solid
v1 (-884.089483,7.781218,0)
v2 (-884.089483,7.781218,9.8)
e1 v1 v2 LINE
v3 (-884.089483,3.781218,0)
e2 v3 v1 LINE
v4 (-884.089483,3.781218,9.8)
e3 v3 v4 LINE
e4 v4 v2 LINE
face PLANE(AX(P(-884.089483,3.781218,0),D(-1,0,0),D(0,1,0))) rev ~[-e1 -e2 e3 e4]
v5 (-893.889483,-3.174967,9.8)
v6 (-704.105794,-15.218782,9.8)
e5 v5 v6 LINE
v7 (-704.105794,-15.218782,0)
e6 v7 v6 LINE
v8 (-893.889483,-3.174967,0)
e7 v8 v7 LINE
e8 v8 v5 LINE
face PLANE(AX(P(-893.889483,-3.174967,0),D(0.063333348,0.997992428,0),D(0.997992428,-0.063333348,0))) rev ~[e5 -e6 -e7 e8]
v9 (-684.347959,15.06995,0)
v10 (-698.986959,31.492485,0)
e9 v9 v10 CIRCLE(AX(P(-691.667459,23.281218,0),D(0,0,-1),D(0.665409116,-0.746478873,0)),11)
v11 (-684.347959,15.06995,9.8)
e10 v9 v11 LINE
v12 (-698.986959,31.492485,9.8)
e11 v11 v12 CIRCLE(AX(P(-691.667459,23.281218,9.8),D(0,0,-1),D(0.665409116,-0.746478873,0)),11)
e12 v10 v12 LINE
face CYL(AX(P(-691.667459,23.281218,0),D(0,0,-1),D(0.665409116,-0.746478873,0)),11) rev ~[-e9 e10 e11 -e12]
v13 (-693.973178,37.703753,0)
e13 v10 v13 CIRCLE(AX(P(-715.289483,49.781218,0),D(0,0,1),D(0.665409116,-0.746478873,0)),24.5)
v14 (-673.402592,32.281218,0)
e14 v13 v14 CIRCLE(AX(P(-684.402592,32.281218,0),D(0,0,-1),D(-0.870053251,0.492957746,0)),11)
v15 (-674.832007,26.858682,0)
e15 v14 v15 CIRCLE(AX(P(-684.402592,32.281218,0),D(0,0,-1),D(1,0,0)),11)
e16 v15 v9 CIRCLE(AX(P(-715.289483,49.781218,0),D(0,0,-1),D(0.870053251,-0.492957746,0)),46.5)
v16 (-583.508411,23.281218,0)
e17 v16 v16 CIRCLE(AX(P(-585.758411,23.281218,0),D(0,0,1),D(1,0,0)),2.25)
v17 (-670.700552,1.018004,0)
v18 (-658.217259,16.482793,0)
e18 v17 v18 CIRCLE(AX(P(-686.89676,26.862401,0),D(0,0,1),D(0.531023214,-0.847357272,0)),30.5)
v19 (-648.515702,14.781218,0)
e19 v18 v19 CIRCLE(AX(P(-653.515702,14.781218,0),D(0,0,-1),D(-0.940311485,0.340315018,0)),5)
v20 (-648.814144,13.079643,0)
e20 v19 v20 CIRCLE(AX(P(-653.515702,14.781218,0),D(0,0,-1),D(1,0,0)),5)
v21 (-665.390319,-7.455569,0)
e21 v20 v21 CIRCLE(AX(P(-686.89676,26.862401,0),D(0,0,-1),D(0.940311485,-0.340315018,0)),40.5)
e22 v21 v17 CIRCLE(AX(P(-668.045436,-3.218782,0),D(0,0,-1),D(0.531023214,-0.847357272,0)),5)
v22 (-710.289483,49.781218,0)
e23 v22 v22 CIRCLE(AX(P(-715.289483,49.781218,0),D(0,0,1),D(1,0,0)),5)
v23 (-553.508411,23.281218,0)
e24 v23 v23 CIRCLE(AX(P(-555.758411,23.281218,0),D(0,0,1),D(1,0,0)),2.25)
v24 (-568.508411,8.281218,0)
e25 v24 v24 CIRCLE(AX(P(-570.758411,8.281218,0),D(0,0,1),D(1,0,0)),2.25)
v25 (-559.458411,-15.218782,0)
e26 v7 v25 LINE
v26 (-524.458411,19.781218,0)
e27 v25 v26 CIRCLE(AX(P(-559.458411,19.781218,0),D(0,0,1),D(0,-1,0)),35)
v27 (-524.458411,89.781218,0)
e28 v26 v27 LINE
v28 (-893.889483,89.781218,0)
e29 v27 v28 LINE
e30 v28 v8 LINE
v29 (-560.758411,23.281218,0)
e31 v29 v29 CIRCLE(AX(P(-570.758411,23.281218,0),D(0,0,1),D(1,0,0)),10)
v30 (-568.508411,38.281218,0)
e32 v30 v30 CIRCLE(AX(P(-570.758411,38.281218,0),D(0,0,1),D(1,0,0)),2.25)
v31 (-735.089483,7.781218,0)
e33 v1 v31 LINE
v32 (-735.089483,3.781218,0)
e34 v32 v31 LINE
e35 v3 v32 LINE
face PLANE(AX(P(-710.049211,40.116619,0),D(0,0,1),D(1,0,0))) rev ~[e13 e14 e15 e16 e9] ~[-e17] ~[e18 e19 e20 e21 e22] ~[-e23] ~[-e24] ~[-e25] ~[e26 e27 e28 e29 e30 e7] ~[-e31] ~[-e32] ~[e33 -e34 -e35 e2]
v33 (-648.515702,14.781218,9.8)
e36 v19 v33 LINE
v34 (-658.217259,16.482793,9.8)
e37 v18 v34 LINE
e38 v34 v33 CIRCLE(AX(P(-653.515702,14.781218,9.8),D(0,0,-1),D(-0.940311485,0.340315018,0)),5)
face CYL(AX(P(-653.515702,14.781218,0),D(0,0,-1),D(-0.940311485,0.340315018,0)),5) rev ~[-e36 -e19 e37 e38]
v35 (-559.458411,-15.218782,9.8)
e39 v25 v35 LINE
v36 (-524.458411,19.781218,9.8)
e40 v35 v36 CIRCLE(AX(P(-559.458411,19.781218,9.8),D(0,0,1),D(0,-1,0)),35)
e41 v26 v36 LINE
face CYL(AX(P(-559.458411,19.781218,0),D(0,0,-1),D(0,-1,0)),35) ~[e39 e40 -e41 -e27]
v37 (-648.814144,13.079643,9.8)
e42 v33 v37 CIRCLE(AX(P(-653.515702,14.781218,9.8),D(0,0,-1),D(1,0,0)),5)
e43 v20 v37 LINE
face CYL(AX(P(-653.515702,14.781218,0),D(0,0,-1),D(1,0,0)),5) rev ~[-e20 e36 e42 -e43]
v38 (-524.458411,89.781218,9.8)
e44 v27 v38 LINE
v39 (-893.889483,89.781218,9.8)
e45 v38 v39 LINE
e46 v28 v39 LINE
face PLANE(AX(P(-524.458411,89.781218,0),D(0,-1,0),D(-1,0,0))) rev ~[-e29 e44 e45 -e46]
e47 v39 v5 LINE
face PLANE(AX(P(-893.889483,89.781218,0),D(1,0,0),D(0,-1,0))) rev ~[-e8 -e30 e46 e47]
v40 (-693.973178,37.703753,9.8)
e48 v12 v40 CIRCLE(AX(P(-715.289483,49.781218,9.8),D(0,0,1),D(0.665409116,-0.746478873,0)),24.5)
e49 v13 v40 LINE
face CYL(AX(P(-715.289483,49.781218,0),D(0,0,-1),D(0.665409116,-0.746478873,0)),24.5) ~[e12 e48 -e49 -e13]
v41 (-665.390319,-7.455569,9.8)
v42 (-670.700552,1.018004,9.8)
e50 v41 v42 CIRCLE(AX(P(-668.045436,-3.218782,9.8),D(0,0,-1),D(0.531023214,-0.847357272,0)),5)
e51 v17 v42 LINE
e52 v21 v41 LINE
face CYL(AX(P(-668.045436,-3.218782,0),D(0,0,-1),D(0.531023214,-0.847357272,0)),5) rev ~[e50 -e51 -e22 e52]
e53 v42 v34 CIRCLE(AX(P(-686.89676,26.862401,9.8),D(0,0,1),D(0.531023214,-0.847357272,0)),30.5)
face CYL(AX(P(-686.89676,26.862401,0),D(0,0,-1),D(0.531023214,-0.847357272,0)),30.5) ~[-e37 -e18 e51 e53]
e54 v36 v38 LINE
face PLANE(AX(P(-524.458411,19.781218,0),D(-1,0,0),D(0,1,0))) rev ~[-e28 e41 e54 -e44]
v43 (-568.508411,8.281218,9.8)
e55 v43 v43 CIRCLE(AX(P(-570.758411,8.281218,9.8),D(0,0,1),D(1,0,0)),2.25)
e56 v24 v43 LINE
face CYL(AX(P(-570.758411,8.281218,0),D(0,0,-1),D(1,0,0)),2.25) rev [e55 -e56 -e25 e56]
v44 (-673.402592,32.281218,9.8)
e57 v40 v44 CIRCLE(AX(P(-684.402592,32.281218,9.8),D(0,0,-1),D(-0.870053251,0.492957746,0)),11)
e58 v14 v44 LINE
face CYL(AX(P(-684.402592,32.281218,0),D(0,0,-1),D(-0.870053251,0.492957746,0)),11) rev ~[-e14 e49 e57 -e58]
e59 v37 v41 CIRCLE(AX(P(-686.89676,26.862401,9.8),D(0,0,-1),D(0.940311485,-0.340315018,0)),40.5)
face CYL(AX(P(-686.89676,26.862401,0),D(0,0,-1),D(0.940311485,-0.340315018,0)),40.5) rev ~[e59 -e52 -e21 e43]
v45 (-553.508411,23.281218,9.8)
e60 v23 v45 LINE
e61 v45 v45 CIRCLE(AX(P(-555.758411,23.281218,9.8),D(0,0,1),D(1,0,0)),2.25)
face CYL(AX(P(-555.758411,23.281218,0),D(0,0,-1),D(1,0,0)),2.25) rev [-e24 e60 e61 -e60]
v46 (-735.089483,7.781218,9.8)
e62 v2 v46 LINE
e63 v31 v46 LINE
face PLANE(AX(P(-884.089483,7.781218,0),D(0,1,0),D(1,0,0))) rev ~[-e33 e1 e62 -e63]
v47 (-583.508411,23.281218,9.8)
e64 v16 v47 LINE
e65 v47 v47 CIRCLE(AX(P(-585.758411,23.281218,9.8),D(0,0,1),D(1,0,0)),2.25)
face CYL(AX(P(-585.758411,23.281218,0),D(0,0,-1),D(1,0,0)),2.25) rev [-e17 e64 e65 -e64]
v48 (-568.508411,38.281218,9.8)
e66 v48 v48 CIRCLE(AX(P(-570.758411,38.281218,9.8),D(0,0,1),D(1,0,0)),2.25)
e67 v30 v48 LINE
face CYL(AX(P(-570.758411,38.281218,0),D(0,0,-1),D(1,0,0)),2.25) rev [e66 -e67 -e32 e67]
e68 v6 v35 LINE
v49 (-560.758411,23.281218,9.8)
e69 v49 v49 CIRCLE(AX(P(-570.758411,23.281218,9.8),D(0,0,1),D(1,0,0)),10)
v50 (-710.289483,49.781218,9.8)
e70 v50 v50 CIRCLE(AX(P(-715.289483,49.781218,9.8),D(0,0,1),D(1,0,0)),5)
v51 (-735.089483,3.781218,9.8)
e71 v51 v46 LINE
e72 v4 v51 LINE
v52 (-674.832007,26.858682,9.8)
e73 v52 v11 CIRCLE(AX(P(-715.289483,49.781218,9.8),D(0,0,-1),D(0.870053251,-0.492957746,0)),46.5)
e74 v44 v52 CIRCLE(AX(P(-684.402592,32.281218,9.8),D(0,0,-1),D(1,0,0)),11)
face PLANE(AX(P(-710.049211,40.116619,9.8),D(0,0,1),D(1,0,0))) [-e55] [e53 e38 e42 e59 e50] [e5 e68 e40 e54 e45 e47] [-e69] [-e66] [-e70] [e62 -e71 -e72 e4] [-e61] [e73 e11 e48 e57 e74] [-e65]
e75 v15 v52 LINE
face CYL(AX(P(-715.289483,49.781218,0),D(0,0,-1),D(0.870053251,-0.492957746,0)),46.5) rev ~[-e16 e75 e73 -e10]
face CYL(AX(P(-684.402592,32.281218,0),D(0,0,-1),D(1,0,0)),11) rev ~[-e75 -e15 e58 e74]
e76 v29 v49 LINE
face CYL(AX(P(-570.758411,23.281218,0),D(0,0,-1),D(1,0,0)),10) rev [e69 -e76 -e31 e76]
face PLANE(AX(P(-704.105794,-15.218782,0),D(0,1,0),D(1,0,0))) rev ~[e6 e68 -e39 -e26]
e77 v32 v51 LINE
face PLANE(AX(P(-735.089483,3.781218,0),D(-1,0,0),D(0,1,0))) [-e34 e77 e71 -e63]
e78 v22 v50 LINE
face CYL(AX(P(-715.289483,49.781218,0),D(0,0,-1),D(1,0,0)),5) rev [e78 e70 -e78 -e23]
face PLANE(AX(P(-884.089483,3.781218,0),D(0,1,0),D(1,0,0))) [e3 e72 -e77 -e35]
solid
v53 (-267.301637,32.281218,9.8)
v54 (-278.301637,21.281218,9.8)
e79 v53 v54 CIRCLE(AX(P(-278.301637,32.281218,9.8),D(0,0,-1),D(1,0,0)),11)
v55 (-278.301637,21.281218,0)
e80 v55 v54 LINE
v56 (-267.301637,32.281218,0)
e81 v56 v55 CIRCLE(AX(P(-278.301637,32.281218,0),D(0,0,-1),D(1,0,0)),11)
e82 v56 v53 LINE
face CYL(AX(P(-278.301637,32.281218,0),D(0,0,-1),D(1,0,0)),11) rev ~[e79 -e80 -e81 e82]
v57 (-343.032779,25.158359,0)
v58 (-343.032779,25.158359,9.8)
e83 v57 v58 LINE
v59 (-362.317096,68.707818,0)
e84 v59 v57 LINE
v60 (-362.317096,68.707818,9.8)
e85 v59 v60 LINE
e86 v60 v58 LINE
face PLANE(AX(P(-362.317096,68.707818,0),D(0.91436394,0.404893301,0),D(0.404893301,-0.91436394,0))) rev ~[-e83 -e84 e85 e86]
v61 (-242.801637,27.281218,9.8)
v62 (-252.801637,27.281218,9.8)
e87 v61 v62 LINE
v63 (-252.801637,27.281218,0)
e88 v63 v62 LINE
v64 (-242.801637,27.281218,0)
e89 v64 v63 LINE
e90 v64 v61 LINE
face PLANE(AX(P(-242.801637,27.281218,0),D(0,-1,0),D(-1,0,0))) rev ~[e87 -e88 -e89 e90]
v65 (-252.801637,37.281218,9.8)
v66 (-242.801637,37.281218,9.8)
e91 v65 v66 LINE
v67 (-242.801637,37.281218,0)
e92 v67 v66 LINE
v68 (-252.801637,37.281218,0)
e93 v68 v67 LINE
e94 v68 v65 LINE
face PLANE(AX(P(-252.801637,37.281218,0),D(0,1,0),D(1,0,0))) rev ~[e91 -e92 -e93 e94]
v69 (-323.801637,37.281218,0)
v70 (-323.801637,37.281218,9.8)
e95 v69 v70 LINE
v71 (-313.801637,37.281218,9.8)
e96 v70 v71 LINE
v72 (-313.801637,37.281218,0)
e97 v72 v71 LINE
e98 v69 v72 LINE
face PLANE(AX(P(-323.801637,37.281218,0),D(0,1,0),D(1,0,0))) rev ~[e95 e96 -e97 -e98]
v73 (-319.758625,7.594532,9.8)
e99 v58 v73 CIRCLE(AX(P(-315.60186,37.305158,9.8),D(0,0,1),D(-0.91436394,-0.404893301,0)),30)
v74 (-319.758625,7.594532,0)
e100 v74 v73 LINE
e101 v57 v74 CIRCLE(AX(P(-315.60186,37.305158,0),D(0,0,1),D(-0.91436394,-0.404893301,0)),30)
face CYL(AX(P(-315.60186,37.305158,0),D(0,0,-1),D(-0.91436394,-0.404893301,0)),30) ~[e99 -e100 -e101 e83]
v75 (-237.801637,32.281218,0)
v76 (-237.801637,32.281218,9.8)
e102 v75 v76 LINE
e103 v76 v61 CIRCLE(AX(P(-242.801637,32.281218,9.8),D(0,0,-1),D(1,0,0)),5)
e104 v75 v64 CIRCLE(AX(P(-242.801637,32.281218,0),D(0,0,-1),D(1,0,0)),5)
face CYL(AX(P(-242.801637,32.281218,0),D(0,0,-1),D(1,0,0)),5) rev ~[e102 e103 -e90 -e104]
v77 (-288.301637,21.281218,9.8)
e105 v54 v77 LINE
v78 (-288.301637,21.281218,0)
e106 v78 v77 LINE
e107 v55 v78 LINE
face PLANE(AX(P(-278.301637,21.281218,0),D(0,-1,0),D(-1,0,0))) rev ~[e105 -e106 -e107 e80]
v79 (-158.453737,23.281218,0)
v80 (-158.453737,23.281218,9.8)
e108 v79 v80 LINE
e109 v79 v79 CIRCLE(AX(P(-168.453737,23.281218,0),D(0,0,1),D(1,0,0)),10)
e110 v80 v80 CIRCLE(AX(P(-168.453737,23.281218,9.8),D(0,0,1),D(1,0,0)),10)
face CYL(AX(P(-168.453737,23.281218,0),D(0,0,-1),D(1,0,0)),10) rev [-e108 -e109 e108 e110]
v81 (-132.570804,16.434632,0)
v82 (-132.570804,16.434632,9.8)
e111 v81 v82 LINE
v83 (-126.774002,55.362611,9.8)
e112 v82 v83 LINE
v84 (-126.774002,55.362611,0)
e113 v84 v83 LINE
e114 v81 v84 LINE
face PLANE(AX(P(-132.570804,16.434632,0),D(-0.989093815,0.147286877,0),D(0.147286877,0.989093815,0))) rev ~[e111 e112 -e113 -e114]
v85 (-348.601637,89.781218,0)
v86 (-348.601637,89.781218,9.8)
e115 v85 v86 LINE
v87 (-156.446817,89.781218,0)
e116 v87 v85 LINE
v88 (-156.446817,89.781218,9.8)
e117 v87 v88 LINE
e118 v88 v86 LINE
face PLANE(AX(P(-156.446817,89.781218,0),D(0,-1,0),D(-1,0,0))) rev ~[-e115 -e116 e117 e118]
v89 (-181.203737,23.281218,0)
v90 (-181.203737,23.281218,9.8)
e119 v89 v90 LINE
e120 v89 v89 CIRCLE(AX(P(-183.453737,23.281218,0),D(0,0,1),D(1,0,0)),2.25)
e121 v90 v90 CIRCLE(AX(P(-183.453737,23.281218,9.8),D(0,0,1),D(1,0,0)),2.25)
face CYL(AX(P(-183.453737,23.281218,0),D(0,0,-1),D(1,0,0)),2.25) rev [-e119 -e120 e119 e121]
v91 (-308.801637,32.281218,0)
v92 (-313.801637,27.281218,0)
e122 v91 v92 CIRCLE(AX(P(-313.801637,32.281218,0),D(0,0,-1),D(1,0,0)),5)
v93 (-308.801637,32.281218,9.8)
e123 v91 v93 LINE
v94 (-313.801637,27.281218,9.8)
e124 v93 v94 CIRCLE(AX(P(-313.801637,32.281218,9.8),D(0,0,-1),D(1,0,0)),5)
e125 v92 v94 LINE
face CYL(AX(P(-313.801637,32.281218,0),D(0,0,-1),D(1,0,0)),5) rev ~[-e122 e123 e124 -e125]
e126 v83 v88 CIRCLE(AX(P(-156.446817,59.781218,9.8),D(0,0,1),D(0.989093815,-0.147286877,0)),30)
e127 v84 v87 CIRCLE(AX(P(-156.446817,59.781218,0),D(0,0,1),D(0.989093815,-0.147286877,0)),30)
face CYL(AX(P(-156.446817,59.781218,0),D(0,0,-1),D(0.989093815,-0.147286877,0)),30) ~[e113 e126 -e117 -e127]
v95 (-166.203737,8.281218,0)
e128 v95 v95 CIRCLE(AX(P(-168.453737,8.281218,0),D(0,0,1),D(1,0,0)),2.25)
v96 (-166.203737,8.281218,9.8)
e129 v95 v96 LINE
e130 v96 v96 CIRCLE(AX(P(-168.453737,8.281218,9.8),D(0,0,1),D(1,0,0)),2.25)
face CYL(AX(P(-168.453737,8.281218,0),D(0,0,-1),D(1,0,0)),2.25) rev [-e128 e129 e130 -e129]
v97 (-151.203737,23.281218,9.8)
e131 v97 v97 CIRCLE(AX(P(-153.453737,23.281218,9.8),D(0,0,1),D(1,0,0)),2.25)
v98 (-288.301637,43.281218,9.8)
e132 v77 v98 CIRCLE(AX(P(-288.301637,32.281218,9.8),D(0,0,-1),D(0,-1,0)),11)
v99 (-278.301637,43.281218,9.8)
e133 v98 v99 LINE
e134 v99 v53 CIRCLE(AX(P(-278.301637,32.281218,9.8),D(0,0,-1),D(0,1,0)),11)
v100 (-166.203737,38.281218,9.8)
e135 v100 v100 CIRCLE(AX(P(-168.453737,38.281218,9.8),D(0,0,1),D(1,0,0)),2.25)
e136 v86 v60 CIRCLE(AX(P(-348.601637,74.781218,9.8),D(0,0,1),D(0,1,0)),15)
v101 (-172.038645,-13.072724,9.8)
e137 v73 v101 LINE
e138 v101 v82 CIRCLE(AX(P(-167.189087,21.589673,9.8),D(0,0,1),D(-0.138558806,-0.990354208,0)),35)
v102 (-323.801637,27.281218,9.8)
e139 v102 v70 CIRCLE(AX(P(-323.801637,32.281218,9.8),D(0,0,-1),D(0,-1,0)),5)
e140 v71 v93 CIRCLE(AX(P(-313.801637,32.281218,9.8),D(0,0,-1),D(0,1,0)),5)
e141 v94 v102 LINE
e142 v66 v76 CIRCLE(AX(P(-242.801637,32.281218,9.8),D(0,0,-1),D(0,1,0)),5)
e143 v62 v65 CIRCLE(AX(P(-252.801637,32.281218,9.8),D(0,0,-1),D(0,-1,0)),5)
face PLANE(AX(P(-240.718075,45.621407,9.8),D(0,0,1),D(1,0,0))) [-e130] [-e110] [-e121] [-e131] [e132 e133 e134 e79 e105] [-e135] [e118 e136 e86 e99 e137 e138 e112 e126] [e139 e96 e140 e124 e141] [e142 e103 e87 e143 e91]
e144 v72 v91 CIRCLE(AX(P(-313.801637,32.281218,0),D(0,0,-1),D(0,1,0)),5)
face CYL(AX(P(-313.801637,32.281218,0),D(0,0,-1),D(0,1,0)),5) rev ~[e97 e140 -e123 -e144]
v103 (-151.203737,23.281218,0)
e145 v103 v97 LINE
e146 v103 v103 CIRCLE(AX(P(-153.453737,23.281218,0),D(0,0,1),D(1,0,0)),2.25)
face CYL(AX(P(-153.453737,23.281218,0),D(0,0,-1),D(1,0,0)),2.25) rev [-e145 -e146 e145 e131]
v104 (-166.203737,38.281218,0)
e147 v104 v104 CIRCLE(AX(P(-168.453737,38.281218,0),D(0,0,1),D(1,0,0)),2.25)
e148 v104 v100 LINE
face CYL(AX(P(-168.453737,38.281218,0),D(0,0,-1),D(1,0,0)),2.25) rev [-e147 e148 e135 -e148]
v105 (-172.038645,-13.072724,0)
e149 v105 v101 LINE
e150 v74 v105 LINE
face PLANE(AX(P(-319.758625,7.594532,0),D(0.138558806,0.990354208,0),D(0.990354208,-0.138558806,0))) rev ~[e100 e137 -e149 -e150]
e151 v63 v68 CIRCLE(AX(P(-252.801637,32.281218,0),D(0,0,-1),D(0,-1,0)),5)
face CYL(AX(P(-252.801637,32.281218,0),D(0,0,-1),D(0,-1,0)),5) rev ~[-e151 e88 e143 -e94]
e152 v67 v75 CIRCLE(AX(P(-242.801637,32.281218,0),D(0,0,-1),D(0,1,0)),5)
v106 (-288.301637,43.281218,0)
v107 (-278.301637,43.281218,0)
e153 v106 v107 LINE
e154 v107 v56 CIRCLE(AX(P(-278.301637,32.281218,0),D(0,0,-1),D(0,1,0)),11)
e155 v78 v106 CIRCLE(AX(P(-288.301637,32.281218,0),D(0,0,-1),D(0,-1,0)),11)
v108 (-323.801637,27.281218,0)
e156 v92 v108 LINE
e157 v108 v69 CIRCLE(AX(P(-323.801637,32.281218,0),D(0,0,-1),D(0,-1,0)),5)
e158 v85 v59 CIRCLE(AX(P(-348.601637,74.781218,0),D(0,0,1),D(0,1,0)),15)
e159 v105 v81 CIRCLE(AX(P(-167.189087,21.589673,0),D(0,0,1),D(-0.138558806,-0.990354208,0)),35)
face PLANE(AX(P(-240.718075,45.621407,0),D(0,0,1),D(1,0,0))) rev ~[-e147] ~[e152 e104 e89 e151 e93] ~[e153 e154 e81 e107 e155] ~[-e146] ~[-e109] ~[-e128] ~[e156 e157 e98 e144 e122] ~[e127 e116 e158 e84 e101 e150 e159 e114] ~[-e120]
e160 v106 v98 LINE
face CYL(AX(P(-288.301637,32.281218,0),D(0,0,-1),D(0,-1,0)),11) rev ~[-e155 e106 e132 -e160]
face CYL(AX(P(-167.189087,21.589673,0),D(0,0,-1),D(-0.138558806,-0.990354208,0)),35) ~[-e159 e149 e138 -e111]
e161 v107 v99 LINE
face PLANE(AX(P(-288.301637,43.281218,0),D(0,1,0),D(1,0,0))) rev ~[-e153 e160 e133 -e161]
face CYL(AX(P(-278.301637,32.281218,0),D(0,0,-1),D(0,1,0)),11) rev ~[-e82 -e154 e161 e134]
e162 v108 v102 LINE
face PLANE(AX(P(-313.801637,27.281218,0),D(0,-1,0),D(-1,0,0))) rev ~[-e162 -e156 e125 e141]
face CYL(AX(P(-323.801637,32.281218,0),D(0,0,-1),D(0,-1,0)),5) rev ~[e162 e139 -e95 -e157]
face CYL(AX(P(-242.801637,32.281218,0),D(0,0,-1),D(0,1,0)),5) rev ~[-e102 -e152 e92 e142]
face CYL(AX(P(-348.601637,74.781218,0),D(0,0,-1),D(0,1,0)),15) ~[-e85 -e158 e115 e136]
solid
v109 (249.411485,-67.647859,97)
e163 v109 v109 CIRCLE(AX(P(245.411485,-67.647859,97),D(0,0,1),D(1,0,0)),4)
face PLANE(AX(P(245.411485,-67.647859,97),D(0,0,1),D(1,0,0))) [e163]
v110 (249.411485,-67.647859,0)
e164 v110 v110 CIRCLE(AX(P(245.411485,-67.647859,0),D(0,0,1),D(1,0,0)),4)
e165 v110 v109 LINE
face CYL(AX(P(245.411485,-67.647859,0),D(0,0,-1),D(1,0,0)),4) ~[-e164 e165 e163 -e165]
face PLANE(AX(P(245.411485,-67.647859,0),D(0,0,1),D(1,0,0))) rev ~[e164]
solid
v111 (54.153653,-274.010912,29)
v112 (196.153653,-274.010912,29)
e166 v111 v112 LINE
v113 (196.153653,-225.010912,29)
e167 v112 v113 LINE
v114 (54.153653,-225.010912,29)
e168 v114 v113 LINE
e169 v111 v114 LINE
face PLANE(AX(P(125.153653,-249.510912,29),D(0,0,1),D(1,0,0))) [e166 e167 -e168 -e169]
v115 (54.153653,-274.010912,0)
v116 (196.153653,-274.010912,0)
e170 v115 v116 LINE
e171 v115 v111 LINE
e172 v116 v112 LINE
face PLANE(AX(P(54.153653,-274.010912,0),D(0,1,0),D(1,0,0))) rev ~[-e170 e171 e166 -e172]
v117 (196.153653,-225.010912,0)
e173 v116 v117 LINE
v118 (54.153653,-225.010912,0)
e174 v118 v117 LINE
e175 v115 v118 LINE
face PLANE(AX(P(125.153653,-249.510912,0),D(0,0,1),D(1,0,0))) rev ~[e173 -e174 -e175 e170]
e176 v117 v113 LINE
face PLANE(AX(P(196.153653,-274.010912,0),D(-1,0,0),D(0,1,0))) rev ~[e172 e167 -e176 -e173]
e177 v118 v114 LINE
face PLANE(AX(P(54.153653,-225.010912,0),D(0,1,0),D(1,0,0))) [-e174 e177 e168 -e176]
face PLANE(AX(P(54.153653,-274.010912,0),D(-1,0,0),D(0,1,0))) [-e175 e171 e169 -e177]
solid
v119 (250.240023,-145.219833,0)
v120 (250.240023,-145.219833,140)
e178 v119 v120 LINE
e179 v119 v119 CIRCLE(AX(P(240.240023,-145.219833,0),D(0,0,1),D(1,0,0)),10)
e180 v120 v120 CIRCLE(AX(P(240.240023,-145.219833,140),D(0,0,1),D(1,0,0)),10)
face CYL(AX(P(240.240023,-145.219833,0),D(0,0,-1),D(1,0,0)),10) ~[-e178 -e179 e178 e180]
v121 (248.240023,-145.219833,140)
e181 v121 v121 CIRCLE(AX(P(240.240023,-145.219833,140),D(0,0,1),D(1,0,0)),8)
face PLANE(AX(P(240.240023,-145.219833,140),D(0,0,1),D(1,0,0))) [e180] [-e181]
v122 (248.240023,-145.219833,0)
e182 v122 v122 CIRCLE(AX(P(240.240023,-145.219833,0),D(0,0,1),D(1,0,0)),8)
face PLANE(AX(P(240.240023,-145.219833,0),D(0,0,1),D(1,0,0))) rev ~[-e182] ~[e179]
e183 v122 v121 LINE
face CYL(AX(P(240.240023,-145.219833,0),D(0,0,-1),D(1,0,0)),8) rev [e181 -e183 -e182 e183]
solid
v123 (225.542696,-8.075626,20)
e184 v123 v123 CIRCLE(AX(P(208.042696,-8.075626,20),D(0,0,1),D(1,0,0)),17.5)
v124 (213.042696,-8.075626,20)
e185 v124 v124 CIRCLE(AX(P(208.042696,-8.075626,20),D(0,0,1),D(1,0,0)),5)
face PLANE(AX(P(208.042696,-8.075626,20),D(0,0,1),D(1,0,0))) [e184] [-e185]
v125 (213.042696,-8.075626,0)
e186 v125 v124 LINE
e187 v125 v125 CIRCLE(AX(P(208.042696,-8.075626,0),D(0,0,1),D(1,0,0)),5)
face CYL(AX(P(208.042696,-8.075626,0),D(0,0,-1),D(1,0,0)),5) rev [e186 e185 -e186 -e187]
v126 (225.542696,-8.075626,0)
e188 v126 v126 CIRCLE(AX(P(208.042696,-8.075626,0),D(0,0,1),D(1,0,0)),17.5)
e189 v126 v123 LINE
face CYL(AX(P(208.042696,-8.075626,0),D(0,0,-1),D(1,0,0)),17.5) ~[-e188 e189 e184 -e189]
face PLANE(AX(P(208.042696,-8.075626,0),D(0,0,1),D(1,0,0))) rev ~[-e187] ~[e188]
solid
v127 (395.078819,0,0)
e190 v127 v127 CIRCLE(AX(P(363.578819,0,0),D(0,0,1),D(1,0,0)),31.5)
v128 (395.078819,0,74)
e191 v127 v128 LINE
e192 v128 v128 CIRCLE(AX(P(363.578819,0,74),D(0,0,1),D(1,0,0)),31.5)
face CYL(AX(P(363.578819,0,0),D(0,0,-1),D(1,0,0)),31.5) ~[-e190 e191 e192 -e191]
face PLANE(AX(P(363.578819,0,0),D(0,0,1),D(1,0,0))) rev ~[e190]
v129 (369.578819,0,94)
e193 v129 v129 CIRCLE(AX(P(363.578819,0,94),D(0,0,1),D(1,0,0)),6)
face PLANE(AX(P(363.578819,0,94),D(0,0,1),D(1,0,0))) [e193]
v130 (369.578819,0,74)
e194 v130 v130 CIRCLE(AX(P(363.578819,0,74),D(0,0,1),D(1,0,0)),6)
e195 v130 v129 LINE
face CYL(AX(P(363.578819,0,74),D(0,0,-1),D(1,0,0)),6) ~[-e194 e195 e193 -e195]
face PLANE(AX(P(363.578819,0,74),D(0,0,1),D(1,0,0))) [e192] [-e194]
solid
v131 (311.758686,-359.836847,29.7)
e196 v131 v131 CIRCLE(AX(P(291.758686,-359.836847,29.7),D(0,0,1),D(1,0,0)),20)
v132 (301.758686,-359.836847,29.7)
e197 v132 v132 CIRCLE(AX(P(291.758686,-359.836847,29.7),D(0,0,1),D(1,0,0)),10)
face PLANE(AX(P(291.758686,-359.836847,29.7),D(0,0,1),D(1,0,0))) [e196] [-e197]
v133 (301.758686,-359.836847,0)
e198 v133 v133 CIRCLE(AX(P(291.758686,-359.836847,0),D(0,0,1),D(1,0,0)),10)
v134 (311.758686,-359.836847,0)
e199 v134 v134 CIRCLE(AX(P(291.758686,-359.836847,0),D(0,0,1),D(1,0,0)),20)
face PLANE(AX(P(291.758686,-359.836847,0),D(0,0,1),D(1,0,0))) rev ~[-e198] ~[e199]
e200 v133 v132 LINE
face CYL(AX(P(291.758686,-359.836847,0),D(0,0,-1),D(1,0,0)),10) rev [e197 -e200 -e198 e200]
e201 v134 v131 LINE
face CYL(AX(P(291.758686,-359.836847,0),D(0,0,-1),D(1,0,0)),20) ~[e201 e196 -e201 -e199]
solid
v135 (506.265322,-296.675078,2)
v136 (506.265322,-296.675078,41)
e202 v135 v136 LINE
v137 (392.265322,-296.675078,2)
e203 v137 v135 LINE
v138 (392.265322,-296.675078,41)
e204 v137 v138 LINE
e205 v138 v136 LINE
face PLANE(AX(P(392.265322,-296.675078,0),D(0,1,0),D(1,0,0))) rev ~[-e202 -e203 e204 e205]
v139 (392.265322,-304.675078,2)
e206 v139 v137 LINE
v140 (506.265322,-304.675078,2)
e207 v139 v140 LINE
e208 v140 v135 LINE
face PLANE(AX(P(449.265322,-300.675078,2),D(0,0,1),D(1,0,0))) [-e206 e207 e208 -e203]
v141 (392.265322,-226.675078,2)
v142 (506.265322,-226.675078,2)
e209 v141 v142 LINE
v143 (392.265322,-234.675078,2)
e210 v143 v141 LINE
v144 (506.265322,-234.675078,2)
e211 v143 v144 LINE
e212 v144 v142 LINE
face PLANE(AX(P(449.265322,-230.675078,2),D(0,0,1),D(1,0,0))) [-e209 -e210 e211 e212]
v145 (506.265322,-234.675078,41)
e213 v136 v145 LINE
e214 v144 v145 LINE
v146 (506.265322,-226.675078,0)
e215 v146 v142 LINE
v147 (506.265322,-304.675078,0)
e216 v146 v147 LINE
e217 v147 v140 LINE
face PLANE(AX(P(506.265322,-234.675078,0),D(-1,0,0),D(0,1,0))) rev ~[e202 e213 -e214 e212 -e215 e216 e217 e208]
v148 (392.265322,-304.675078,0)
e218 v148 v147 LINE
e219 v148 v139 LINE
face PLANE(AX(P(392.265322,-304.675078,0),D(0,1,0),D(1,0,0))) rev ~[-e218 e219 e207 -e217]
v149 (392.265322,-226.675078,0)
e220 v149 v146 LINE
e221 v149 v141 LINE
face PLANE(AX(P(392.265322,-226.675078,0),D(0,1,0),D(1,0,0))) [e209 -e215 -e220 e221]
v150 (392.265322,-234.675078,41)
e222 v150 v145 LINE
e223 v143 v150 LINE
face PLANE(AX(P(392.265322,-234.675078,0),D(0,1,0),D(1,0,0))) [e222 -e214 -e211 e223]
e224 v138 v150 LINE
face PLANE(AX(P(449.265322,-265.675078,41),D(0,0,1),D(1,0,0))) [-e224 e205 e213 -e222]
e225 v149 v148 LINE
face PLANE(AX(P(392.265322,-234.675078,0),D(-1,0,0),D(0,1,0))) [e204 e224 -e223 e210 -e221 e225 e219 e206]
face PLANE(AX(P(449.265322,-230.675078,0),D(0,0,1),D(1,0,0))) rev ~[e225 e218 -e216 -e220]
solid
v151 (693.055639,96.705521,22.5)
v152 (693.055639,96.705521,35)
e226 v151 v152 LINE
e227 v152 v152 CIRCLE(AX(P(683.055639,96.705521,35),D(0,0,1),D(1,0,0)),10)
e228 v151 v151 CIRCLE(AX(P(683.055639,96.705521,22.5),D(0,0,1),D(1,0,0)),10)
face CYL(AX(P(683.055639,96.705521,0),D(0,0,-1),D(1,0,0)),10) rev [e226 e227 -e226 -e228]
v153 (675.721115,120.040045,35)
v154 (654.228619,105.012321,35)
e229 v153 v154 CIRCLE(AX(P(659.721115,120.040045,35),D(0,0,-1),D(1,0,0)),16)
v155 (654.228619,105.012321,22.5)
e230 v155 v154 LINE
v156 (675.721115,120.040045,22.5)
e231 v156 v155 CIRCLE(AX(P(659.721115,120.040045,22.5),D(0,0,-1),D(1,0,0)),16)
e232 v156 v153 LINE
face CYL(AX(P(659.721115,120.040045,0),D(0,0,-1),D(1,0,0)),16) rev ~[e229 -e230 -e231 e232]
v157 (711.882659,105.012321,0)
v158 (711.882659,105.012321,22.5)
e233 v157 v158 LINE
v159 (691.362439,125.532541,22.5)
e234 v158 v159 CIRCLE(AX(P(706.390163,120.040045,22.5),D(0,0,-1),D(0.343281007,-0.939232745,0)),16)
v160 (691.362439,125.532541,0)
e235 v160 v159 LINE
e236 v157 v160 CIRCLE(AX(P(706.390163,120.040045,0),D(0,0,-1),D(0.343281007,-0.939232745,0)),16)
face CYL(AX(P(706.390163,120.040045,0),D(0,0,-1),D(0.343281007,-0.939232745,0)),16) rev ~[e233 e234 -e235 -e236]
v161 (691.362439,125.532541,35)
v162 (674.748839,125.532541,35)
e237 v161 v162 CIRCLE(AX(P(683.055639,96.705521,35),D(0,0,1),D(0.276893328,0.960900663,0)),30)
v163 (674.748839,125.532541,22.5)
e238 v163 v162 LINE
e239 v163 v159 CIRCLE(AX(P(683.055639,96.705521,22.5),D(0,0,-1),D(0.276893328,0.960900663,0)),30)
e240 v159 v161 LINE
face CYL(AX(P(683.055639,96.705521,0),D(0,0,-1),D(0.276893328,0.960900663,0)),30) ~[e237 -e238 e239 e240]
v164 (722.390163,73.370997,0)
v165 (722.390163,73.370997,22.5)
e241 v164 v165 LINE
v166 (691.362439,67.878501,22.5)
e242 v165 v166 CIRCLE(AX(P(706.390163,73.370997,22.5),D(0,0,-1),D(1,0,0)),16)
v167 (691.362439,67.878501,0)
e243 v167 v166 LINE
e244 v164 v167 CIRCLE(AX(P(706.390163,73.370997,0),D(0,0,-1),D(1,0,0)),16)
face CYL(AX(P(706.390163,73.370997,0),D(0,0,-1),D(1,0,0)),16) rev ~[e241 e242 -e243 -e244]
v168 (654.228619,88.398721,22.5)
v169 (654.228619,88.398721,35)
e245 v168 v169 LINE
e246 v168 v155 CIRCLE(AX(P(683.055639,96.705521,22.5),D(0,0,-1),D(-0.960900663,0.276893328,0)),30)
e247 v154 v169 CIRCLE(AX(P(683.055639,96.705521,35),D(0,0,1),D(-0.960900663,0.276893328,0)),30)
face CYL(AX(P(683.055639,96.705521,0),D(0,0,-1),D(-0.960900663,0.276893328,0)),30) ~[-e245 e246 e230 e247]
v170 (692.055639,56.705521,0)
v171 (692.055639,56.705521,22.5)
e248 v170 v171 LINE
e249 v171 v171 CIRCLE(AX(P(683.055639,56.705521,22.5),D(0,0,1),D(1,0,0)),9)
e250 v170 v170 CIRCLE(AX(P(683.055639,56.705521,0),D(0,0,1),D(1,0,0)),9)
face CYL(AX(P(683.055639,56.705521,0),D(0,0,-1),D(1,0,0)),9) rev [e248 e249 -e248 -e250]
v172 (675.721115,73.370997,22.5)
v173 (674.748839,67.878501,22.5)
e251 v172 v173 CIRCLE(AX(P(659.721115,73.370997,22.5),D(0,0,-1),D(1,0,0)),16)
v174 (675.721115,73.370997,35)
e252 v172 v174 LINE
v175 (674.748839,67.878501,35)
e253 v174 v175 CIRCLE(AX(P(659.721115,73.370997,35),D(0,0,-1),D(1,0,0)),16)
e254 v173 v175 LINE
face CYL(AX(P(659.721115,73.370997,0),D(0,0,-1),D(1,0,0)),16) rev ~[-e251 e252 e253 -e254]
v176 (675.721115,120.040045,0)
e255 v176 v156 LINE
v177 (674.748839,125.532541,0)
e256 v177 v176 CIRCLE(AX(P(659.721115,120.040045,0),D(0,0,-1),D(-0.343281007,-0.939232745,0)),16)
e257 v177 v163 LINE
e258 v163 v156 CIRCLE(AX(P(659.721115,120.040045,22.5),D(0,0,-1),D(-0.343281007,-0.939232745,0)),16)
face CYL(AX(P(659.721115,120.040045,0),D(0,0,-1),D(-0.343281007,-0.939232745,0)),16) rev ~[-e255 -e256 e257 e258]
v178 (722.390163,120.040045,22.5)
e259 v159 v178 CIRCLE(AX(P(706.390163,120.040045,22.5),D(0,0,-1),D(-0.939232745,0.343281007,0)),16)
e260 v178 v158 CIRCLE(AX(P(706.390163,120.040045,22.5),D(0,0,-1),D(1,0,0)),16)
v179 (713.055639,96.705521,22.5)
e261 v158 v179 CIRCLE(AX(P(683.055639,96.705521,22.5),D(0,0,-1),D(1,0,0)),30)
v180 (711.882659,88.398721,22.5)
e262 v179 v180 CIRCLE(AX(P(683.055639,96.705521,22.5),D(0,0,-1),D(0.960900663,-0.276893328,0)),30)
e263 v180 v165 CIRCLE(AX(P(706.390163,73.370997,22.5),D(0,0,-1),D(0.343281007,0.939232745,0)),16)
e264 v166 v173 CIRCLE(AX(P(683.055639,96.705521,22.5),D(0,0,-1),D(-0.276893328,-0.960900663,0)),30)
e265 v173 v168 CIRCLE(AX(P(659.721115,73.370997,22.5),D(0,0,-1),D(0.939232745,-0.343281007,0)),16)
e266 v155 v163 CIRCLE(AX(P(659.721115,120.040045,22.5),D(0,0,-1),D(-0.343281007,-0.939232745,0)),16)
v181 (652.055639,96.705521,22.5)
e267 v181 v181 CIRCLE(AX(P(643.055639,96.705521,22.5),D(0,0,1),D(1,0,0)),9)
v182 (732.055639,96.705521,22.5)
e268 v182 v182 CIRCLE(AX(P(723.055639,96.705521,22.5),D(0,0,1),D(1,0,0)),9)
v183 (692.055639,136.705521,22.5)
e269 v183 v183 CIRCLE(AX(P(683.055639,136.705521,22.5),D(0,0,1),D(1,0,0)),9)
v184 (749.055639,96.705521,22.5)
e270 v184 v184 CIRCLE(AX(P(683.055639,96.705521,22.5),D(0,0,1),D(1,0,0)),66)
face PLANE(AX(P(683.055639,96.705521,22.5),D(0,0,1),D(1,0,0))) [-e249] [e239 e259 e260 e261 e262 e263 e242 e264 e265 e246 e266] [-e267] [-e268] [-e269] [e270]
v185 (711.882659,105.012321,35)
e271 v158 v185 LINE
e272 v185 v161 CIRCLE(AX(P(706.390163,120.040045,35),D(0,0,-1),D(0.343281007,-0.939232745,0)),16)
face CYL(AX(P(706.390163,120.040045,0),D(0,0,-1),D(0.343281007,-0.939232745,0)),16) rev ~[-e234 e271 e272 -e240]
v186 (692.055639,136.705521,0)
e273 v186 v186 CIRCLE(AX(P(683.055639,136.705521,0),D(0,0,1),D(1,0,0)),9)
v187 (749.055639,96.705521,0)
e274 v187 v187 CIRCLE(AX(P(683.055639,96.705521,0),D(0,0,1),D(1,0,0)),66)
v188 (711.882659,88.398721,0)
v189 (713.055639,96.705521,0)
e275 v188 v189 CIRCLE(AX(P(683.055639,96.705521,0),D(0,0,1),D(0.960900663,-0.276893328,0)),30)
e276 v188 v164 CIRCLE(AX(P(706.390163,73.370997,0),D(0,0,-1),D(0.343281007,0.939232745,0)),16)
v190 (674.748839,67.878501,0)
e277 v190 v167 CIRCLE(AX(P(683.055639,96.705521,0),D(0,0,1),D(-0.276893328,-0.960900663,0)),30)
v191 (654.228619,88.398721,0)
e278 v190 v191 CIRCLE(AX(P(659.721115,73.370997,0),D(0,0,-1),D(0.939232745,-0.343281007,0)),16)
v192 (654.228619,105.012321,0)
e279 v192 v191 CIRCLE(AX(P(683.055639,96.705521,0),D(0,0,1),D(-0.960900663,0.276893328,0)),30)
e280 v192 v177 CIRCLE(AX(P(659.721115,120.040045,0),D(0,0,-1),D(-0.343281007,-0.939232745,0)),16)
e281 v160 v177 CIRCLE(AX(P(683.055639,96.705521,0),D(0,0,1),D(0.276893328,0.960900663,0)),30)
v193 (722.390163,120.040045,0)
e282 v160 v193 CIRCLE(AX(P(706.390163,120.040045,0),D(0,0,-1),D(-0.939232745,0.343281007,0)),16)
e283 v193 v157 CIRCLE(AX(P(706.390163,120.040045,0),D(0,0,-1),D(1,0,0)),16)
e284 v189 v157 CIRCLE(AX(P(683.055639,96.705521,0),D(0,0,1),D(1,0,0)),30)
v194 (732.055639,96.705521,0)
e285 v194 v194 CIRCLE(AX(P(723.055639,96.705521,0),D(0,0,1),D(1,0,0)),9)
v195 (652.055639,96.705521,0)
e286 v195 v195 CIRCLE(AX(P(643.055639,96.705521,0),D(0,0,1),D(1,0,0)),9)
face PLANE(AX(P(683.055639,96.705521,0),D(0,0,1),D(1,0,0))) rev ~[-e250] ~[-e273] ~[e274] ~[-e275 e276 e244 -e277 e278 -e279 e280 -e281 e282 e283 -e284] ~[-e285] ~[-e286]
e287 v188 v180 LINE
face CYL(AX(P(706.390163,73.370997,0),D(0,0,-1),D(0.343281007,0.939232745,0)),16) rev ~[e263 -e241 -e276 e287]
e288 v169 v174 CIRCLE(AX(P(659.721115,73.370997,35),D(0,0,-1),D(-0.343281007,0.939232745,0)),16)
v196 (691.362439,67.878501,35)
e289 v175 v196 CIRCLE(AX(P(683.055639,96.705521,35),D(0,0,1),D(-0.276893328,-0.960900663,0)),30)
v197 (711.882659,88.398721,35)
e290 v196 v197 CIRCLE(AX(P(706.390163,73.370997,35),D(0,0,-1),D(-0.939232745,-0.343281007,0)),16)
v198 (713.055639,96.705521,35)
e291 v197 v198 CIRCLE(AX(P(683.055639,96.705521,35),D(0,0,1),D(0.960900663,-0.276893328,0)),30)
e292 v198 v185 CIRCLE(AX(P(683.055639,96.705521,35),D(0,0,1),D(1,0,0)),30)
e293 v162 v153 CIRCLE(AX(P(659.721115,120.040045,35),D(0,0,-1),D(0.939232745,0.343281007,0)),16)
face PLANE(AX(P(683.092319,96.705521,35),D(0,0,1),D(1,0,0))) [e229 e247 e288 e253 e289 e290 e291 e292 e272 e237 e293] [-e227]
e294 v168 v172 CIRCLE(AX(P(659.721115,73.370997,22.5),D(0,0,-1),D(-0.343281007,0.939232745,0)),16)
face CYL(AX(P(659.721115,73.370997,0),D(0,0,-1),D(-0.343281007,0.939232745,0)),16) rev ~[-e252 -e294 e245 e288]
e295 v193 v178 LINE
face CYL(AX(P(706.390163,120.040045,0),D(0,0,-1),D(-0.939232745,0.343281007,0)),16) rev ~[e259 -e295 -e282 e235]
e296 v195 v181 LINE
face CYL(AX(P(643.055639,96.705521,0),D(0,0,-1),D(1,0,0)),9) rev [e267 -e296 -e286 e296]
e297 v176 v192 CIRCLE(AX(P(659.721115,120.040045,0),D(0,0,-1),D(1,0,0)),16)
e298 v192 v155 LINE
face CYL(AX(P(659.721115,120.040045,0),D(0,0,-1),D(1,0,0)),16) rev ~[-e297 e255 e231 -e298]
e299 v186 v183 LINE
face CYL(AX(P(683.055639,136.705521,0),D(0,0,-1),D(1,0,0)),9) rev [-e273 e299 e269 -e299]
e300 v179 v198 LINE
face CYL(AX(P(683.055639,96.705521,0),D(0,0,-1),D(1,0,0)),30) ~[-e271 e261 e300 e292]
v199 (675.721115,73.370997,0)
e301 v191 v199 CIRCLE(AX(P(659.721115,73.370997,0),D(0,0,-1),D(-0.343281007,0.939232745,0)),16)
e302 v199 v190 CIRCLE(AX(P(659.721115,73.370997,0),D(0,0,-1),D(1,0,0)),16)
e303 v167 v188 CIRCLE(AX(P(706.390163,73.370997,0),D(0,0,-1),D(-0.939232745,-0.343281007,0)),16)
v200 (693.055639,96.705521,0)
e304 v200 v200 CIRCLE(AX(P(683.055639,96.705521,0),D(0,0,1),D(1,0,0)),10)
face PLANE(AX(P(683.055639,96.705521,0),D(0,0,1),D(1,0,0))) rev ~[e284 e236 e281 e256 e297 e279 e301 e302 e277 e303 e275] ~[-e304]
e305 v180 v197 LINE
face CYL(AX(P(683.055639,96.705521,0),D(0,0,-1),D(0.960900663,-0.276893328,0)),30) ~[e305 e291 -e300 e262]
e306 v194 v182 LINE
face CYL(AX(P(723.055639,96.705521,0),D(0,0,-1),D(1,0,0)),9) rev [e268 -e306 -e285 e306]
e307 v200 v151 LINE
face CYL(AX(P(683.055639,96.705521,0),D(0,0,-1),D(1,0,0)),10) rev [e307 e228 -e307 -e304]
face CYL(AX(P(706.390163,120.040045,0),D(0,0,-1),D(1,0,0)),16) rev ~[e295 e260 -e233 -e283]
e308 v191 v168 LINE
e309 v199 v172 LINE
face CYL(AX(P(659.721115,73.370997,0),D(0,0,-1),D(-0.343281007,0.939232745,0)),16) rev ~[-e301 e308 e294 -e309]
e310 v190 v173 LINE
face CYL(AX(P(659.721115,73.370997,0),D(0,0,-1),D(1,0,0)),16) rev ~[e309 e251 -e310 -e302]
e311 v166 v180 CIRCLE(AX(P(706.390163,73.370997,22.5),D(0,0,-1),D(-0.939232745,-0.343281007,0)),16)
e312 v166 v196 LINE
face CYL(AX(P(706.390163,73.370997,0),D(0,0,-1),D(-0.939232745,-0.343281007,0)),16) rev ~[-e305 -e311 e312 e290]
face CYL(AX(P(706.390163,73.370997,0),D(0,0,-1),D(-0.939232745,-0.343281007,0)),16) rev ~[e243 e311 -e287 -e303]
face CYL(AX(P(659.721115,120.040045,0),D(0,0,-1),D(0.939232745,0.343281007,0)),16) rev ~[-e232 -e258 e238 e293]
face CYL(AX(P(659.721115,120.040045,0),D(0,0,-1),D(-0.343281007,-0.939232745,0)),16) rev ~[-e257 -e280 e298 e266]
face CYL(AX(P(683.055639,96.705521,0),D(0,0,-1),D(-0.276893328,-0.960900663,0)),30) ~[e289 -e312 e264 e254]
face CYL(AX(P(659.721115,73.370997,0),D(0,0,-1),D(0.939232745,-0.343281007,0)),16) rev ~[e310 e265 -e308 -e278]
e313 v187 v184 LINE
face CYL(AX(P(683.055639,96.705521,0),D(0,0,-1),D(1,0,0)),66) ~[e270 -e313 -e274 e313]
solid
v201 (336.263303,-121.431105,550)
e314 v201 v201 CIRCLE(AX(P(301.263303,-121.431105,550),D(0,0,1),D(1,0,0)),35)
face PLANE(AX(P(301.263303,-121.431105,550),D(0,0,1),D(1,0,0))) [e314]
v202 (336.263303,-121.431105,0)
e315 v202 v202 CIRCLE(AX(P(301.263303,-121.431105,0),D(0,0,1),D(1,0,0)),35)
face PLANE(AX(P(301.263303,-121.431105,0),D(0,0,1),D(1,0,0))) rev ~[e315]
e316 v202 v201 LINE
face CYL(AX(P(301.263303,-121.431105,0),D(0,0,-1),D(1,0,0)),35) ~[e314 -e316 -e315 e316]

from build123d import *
from build123d import SkipClean  # not in build123d's __all__

# Parameters (mm, degrees)
F0_R      = 31.5
F1_DEPTH  = 74
F2_R      = 6
F3_DEPTH  = 20
F0_R_2    = 66
F0_R_3    = 9
F0_R_4    = 10
F4_DEPTH  = 22.5
F5_DEPTH  = 35
F0_R_5    = 17.5
F0_R_6    = 8
F0_R_7    = 5
F6_DEPTH  = 20
F7_DEPTH  = 140
F0_R_8    = 35
F8_DEPTH  = 550
F0_R_9    = 2.25
F9_DEPTH  = 9.8
F0_W      = 149
F0_H      = 4
F0_R_10   = 4
F10_DEPTH = 97
F0_W_2    = 114
F0_H_2    = 62
F11_DEPTH = 41
F0_H_3    = 8
F12_DEPTH = 2
F0_W_3    = 142
F0_H_4    = 49
F13_DEPTH = 29
F0_R_11   = 20
F14_DEPTH = 29.7


# Not quite as in the source:
# - a feature names something its author has since deleted; it is built from what else it names


with BuildPart() as f1:
    # F0 (on Top) → F1 (new body)
    with BuildSketch(Plane.XY):
        with Locations((363.5788187385, 0)):
            Circle(F0_R)
    extrude(amount=F1_DEPTH)

    # F2 (on face) → F3 (join)
    with BuildSketch(Plane.XY.offset(74)):
        with Locations((363.5788187385, 0)):
            Circle(F2_R)
    extrude(amount=F3_DEPTH)


with BuildPart() as f4:
    # F0 (on Top) → F4 (new body)
    with BuildSketch(Plane.XY):
        with Locations((683.0556392328, 96.7055209691)):
            Circle(F0_R_2)
        with Locations((683.0556392328, 56.7055209691)):
            Circle(F0_R_3, mode=Mode.SUBTRACT)
        with Locations((643.0556392328, 96.7055209691)):
            Circle(F0_R_3, mode=Mode.SUBTRACT)
        with BuildLine():
            ThreePointArc((711.8826591307, 105.0123208226), (712.7609468136, 100.9001248278), (713.0556392328, 96.7055209691))
            ThreePointArc((713.0556392328, 96.7055209691), (712.7609468136, 92.5109171104), (711.8826591307, 88.3987211156))
            ThreePointArc((711.8826591307, 88.3987211156), (719.5027511985, 82.5394229572), (722.390163012, 73.37099719))
            ThreePointArc((722.390163012, 73.37099719), (709.1791070047, 57.6159411315), (691.3624390863, 67.8785010712))
            ThreePointArc((691.3624390863, 67.8785010712), (683.0556392328, 66.7055209691), (674.7488393793, 67.8785010712))
            ThreePointArc((674.7488393793, 67.8785010712), (648.4074069547, 62.057288691), (654.2286193349, 88.3987211156))
            ThreePointArc((654.2286193349, 88.3987211156), (653.0556392328, 96.7055209691), (654.2286193349, 105.0123208226))
            ThreePointArc((654.2286193349, 105.0123208226), (648.4074069547, 131.3537532473), (674.7488393793, 125.532540867))
            ThreePointArc((674.7488393793, 125.532540867), (683.0556392328, 126.7055209691), (691.3624390863, 125.532540867))
            ThreePointArc((691.3624390863, 125.532540867), (709.1791070047, 135.7951008067), (722.390163012, 120.0400447483))
            ThreePointArc((722.390163012, 120.0400447483), (719.5027511985, 110.871618981), (711.8826591307, 105.0123208226))
        make_face(mode=Mode.SUBTRACT)
        with Locations((723.0556392328, 96.7055209691)):
            Circle(F0_R_3, mode=Mode.SUBTRACT)
        with Locations((683.0556392328, 136.7055209691)):
            Circle(F0_R_3, mode=Mode.SUBTRACT)
        with BuildLine():
            ThreePointArc((711.8826591307, 88.3987211156), (712.7609468136, 92.5109171104), (713.0556392328, 96.7055209691))
            ThreePointArc((713.0556392328, 96.7055209691), (712.7609468136, 100.9001248278), (711.8826591307, 105.0123208226))
            ThreePointArc((711.8826591307, 105.0123208226), (695.076454513, 108.7263362493), (691.3624390863, 125.532540867))
            ThreePointArc((691.3624390863, 125.532540867), (683.0556392328, 126.7055209691), (674.7488393793, 125.532540867))
            ThreePointArc((674.7488393793, 125.532540867), (675.4761715121, 122.828988741), (675.7211154536, 120.0400447483))
            ThreePointArc((675.7211154536, 120.0400447483), (668.8895412209, 106.9274565617), (654.2286193349, 105.0123208226))
            ThreePointArc((654.2286193349, 105.0123208226), (653.0556392328, 96.7055209691), (654.2286193349, 88.3987211156))
            ThreePointArc((654.2286193349, 88.3987211156), (668.8895412209, 86.4835853765), (675.7211154536, 73.37099719))
            ThreePointArc((675.7211154536, 73.37099719), (675.4761715121, 70.5820531972), (674.7488393793, 67.8785010712))
            ThreePointArc((674.7488393793, 67.8785010712), (683.0556392328, 66.7055209691), (691.3624390863, 67.8785010712))
            ThreePointArc((691.3624390863, 67.8785010712), (695.076454513, 84.6847056889), (711.8826591307, 88.3987211156))
        make_face()
        with Locations((683.0556392328, 96.7055209691)):
            Circle(F0_R_4, mode=Mode.SUBTRACT)
    extrude(amount=F4_DEPTH)

    # F0 (on Top) → F5 (join)
    with BuildSketch(Plane.XY):
        with BuildLine():
            ThreePointArc((711.8826591307, 88.3987211156), (712.7609468136, 92.5109171104), (713.0556392328, 96.7055209691))
            ThreePointArc((713.0556392328, 96.7055209691), (712.7609468136, 100.9001248278), (711.8826591307, 105.0123208226))
            ThreePointArc((711.8826591307, 105.0123208226), (695.076454513, 108.7263362493), (691.3624390863, 125.532540867))
            ThreePointArc((691.3624390863, 125.532540867), (683.0556392328, 126.7055209691), (674.7488393793, 125.532540867))
            ThreePointArc((674.7488393793, 125.532540867), (675.4761715121, 122.828988741), (675.7211154536, 120.0400447483))
            ThreePointArc((675.7211154536, 120.0400447483), (668.8895412209, 106.9274565617), (654.2286193349, 105.0123208226))
            ThreePointArc((654.2286193349, 105.0123208226), (653.0556392328, 96.7055209691), (654.2286193349, 88.3987211156))
            ThreePointArc((654.2286193349, 88.3987211156), (668.8895412209, 86.4835853765), (675.7211154536, 73.37099719))
            ThreePointArc((675.7211154536, 73.37099719), (675.4761715121, 70.5820531972), (674.7488393793, 67.8785010712))
            ThreePointArc((674.7488393793, 67.8785010712), (683.0556392328, 66.7055209691), (691.3624390863, 67.8785010712))
            ThreePointArc((691.3624390863, 67.8785010712), (695.076454513, 84.6847056889), (711.8826591307, 88.3987211156))
        make_face()
        with Locations((683.0556392328, 96.7055209691)):
            Circle(F0_R_4, mode=Mode.SUBTRACT)
    with SkipClean():  # cleaning this boolean's faces spoils the solid; the shape is the same uncleaned
        extrude(amount=F5_DEPTH)


with BuildPart() as f6:
    # F0 (on Top) → F6 (new body)
    with BuildSketch(Plane.XY):
        with Locations((208.0426961184, -8.0756256357)):
            Circle(F0_R_5)
        with Locations((208.0426961184, -8.0756256357)):
            Circle(F0_R_6, mode=Mode.SUBTRACT)
        with Locations((208.0426961184, -8.0756256357)):
            Circle(F0_R_6)
        with Locations((208.0426961184, -8.0756256357)):
            Circle(F0_R_7, mode=Mode.SUBTRACT)
    extrude(amount=F6_DEPTH)


with BuildPart() as f7:
    # F0 (on Top) → F7 (new body)
    with BuildSketch(Plane.XY):
        with Locations((240.2400225401, -145.2198326588)):
            Circle(F0_R_4)
        with Locations((240.2400225401, -145.2198326588)):
            Circle(F0_R_6, mode=Mode.SUBTRACT)
    extrude(amount=F7_DEPTH)


with BuildPart() as f8:
    # F0 (on Top) → F8 (new body)
    with BuildSketch(Plane.XY):
        with Locations((301.2633025646, -121.4311048388)):
            Circle(F0_R_8)
    extrude(amount=F8_DEPTH)


with BuildPart() as f9:
    # F0 (on Top) → F9 (new body)
    with BuildSketch(Plane.XY):
        with BuildLine():
            ThreePointArc((-343.0327786575, 25.1583589722), (-333.6730371292, 13.3587057847), (-319.75862465, 7.5945317607))
            Line((-319.75862465, 7.5945317607), (-172.0386454256, -13.0727243109))
            ThreePointArc((-172.0386454256, -13.0727243109), (-146.2316237383, -6.4421790119), (-132.5708036572, 16.4346322616))
            Line((-132.5708036572, 16.4346322616), (-126.7740021914, 55.3626113548))
            ThreePointArc((-126.7740021914, 55.3626113548), (-133.7250408713, 79.3700130731), (-156.4468166552, 89.781217673))
            Line((-156.4468166552, 89.781217673), (-348.6016367836, 89.781217673))
            ThreePointArc((-348.6016367836, 89.781217673), (-361.17345035, 82.9634853081), (-362.3170958848, 68.70781816))
            Line((-362.3170958848, 68.70781816), (-343.0327786575, 25.1583589722))
        make_face()
        with Locations((-183.4537373688, 23.281217673)):
            Circle(F0_R_9, mode=Mode.SUBTRACT)
        with Locations((-168.4537373688, 8.281217673)):
            Circle(F0_R_9, mode=Mode.SUBTRACT)
        with Locations((-168.4537373688, 23.281217673)):
            Circle(F0_R_4, mode=Mode.SUBTRACT)
        with Locations((-153.4537373688, 23.281217673)):
            Circle(F0_R_9, mode=Mode.SUBTRACT)
        with BuildLine():
            ThreePointArc((-313.8016367836, 37.281217673), (-310.2661028777, 35.816751579), (-308.8016367836, 32.281217673))
            ThreePointArc((-308.8016367836, 32.281217673), (-310.2661028777, 28.7456837671), (-313.8016367836, 27.281217673))
            Line((-313.8016367836, 27.281217673), (-323.8016367836, 27.281217673))
            ThreePointArc((-323.8016367836, 27.281217673), (-328.8016367836, 32.281217673), (-323.8016367836, 37.281217673))
            Line((-323.8016367836, 37.281217673), (-313.8016367836, 37.281217673))
        make_face(mode=Mode.SUBTRACT)
        with BuildLine():
            ThreePointArc((-278.3016367836, 43.281217673), (-270.5234621906, 40.0593922661), (-267.3016367836, 32.281217673))
            ThreePointArc((-267.3016367836, 32.281217673), (-270.5234621906, 24.50304308), (-278.3016367836, 21.281217673))
            Line((-278.3016367836, 21.281217673), (-288.3016367836, 21.281217673))
            ThreePointArc((-288.3016367836, 21.281217673), (-299.3016367836, 32.281217673), (-288.3016367836, 43.281217673))
            Line((-288.3016367836, 43.281217673), (-278.3016367836, 43.281217673))
        make_face(mode=Mode.SUBTRACT)
        with BuildLine():
            ThreePointArc((-242.8016367836, 37.281217673), (-239.2661028777, 35.816751579), (-237.8016367836, 32.281217673))
            ThreePointArc((-237.8016367836, 32.281217673), (-239.2661028777, 28.7456837671), (-242.8016367836, 27.281217673))
            Line((-242.8016367836, 27.281217673), (-252.8016367836, 27.281217673))
            ThreePointArc((-252.8016367836, 27.281217673), (-257.8016367836, 32.281217673), (-252.8016367836, 37.281217673))
            Line((-252.8016367836, 37.281217673), (-242.8016367836, 37.281217673))
        make_face(mode=Mode.SUBTRACT)
        with Locations((-168.4537373688, 38.281217673)):
            Circle(F0_R_9, mode=Mode.SUBTRACT)
    extrude(amount=F9_DEPTH)


with BuildPart() as f9b:
    # F0 (on Top) → F9, piece 2 (new body)
    with BuildSketch(Plane.XY):
        with BuildLine():
            Line((-524.4584107753, 89.781217673), (-893.8894827475, 89.781217673))
            Line((-893.8894827475, 89.781217673), (-893.8894827475, -3.1749671325))
            Line((-893.8894827475, -3.1749671325), (-704.1057944298, -15.218782327))
            Line((-704.1057944298, -15.218782327), (-559.4584107753, -15.218782327))
            ThreePointArc((-559.4584107753, -15.218782327), (-534.7096734338, -4.9675196685), (-524.4584107753, 19.781217673))
            Line((-524.4584107753, 19.781217673), (-524.4584107753, 89.781217673))
        make_face()
        with Locations((-809.5894827475, 5.781217673)):
            Rectangle(F0_W, F0_H, mode=Mode.SUBTRACT)
        with BuildLine():
            ThreePointArc((-658.2172593255, 16.4827927638), (-652.6519273707, 19.7060418892), (-648.5157019016, 14.781217673))
            ThreePointArc((-648.5157019016, 14.781217673), (-648.5908776855, 13.9174431422), (-648.8141444777, 13.0796425823))
            ThreePointArc((-648.8141444777, 13.0796425823), (-655.3826738126, 1.423996853), (-665.3903194319, -7.4555686854))
            ThreePointArc((-665.3903194319, -7.4555686854), (-672.2822218618, -5.8738983985), (-670.700551575, 1.0180040314))
            ThreePointArc((-670.700551575, 1.0180040314), (-663.1639295654, 7.7050842516), (-658.2172593255, 16.4827927638))
        make_face(mode=Mode.SUBTRACT)
        with Locations((-570.7584107753, 8.281217673)):
            Circle(F0_R_9, mode=Mode.SUBTRACT)
        with Locations((-585.7584107753, 23.281217673)):
            Circle(F0_R_9, mode=Mode.SUBTRACT)
        with Locations((-570.7584107753, 23.281217673)):
            Circle(F0_R_4, mode=Mode.SUBTRACT)
        with Locations((-555.7584107753, 23.281217673)):
            Circle(F0_R_9, mode=Mode.SUBTRACT)
        with Locations((-715.2894827475, 49.781217673)):
            Circle(F0_R_7, mode=Mode.SUBTRACT)
        with BuildLine():
            ThreePointArc((-693.9731780894, 37.7037528843), (-681.5987060406, 42.9178629011), (-673.4025923246, 32.281217673))
            ThreePointArc((-673.4025923246, 32.281217673), (-673.7659470965, 29.4773313891), (-674.8320065597, 26.8586824618))
            ThreePointArc((-674.8320065597, 26.8586824618), (-679.106643497, 20.5741612692), (-684.3479588482, 15.0699500674))
            ThreePointArc((-684.3479588482, 15.0699500674), (-699.8787267311, 15.9617173958), (-698.9869594027, 31.4924852787))
            ThreePointArc((-698.9869594027, 31.4924852787), (-696.2254061532, 34.3925535463), (-693.9731780894, 37.7037528843))
        make_face(mode=Mode.SUBTRACT)
        with Locations((-570.7584107753, 38.281217673)):
            Circle(F0_R_9, mode=Mode.SUBTRACT)
    extrude(amount=F9_DEPTH)


with BuildPart() as f10:
    # F0 (on Top) → F10 (new body)
    with BuildSketch(Plane.XY):
        with Locations((245.4114854336, -67.6478594542)):
            Circle(F0_R_10)
    extrude(amount=F10_DEPTH)


with BuildPart() as f11:
    # F0 (on Top) → F11 (new body)
    with BuildSketch(Plane.XY):
        with Locations((449.2653217316, -265.6750779152)):
            Rectangle(F0_W_2, F0_H_2)
    extrude(amount=F11_DEPTH)

    # F0 (on Top) → F12 (join)
    with BuildSketch(Plane.XY):
        with Locations((449.2653217316, -230.6750779152)):
            Rectangle(F0_W_2, F0_H_3)
        with Locations((449.2653217316, -300.6750779152)):
            Rectangle(F0_W_2, F0_H_3)
    extrude(amount=F12_DEPTH)


with BuildPart() as f13:
    # F0 (on Top) → F13 (new body)
    with BuildSketch(Plane.XY):
        with Locations((125.1536528617, -249.5109115839)):
            Rectangle(F0_W_3, F0_H_4)
    extrude(amount=F13_DEPTH)


with BuildPart() as f14:
    # F0 (on Top) → F14 (new body)
    with BuildSketch(Plane.XY):
        with Locations((291.7586863041, -359.83684659)):
            Circle(F0_R_11)
        with Locations((291.7586863041, -359.83684659)):
            Circle(F0_R_4, mode=Mode.SUBTRACT)
    extrude(amount=F14_DEPTH)


solid = Compound([f1.part, f4.part, f6.part, f7.part, f8.part, f9.part, f9b.part, f10.part, f11.part, f13.part, f14.part])
